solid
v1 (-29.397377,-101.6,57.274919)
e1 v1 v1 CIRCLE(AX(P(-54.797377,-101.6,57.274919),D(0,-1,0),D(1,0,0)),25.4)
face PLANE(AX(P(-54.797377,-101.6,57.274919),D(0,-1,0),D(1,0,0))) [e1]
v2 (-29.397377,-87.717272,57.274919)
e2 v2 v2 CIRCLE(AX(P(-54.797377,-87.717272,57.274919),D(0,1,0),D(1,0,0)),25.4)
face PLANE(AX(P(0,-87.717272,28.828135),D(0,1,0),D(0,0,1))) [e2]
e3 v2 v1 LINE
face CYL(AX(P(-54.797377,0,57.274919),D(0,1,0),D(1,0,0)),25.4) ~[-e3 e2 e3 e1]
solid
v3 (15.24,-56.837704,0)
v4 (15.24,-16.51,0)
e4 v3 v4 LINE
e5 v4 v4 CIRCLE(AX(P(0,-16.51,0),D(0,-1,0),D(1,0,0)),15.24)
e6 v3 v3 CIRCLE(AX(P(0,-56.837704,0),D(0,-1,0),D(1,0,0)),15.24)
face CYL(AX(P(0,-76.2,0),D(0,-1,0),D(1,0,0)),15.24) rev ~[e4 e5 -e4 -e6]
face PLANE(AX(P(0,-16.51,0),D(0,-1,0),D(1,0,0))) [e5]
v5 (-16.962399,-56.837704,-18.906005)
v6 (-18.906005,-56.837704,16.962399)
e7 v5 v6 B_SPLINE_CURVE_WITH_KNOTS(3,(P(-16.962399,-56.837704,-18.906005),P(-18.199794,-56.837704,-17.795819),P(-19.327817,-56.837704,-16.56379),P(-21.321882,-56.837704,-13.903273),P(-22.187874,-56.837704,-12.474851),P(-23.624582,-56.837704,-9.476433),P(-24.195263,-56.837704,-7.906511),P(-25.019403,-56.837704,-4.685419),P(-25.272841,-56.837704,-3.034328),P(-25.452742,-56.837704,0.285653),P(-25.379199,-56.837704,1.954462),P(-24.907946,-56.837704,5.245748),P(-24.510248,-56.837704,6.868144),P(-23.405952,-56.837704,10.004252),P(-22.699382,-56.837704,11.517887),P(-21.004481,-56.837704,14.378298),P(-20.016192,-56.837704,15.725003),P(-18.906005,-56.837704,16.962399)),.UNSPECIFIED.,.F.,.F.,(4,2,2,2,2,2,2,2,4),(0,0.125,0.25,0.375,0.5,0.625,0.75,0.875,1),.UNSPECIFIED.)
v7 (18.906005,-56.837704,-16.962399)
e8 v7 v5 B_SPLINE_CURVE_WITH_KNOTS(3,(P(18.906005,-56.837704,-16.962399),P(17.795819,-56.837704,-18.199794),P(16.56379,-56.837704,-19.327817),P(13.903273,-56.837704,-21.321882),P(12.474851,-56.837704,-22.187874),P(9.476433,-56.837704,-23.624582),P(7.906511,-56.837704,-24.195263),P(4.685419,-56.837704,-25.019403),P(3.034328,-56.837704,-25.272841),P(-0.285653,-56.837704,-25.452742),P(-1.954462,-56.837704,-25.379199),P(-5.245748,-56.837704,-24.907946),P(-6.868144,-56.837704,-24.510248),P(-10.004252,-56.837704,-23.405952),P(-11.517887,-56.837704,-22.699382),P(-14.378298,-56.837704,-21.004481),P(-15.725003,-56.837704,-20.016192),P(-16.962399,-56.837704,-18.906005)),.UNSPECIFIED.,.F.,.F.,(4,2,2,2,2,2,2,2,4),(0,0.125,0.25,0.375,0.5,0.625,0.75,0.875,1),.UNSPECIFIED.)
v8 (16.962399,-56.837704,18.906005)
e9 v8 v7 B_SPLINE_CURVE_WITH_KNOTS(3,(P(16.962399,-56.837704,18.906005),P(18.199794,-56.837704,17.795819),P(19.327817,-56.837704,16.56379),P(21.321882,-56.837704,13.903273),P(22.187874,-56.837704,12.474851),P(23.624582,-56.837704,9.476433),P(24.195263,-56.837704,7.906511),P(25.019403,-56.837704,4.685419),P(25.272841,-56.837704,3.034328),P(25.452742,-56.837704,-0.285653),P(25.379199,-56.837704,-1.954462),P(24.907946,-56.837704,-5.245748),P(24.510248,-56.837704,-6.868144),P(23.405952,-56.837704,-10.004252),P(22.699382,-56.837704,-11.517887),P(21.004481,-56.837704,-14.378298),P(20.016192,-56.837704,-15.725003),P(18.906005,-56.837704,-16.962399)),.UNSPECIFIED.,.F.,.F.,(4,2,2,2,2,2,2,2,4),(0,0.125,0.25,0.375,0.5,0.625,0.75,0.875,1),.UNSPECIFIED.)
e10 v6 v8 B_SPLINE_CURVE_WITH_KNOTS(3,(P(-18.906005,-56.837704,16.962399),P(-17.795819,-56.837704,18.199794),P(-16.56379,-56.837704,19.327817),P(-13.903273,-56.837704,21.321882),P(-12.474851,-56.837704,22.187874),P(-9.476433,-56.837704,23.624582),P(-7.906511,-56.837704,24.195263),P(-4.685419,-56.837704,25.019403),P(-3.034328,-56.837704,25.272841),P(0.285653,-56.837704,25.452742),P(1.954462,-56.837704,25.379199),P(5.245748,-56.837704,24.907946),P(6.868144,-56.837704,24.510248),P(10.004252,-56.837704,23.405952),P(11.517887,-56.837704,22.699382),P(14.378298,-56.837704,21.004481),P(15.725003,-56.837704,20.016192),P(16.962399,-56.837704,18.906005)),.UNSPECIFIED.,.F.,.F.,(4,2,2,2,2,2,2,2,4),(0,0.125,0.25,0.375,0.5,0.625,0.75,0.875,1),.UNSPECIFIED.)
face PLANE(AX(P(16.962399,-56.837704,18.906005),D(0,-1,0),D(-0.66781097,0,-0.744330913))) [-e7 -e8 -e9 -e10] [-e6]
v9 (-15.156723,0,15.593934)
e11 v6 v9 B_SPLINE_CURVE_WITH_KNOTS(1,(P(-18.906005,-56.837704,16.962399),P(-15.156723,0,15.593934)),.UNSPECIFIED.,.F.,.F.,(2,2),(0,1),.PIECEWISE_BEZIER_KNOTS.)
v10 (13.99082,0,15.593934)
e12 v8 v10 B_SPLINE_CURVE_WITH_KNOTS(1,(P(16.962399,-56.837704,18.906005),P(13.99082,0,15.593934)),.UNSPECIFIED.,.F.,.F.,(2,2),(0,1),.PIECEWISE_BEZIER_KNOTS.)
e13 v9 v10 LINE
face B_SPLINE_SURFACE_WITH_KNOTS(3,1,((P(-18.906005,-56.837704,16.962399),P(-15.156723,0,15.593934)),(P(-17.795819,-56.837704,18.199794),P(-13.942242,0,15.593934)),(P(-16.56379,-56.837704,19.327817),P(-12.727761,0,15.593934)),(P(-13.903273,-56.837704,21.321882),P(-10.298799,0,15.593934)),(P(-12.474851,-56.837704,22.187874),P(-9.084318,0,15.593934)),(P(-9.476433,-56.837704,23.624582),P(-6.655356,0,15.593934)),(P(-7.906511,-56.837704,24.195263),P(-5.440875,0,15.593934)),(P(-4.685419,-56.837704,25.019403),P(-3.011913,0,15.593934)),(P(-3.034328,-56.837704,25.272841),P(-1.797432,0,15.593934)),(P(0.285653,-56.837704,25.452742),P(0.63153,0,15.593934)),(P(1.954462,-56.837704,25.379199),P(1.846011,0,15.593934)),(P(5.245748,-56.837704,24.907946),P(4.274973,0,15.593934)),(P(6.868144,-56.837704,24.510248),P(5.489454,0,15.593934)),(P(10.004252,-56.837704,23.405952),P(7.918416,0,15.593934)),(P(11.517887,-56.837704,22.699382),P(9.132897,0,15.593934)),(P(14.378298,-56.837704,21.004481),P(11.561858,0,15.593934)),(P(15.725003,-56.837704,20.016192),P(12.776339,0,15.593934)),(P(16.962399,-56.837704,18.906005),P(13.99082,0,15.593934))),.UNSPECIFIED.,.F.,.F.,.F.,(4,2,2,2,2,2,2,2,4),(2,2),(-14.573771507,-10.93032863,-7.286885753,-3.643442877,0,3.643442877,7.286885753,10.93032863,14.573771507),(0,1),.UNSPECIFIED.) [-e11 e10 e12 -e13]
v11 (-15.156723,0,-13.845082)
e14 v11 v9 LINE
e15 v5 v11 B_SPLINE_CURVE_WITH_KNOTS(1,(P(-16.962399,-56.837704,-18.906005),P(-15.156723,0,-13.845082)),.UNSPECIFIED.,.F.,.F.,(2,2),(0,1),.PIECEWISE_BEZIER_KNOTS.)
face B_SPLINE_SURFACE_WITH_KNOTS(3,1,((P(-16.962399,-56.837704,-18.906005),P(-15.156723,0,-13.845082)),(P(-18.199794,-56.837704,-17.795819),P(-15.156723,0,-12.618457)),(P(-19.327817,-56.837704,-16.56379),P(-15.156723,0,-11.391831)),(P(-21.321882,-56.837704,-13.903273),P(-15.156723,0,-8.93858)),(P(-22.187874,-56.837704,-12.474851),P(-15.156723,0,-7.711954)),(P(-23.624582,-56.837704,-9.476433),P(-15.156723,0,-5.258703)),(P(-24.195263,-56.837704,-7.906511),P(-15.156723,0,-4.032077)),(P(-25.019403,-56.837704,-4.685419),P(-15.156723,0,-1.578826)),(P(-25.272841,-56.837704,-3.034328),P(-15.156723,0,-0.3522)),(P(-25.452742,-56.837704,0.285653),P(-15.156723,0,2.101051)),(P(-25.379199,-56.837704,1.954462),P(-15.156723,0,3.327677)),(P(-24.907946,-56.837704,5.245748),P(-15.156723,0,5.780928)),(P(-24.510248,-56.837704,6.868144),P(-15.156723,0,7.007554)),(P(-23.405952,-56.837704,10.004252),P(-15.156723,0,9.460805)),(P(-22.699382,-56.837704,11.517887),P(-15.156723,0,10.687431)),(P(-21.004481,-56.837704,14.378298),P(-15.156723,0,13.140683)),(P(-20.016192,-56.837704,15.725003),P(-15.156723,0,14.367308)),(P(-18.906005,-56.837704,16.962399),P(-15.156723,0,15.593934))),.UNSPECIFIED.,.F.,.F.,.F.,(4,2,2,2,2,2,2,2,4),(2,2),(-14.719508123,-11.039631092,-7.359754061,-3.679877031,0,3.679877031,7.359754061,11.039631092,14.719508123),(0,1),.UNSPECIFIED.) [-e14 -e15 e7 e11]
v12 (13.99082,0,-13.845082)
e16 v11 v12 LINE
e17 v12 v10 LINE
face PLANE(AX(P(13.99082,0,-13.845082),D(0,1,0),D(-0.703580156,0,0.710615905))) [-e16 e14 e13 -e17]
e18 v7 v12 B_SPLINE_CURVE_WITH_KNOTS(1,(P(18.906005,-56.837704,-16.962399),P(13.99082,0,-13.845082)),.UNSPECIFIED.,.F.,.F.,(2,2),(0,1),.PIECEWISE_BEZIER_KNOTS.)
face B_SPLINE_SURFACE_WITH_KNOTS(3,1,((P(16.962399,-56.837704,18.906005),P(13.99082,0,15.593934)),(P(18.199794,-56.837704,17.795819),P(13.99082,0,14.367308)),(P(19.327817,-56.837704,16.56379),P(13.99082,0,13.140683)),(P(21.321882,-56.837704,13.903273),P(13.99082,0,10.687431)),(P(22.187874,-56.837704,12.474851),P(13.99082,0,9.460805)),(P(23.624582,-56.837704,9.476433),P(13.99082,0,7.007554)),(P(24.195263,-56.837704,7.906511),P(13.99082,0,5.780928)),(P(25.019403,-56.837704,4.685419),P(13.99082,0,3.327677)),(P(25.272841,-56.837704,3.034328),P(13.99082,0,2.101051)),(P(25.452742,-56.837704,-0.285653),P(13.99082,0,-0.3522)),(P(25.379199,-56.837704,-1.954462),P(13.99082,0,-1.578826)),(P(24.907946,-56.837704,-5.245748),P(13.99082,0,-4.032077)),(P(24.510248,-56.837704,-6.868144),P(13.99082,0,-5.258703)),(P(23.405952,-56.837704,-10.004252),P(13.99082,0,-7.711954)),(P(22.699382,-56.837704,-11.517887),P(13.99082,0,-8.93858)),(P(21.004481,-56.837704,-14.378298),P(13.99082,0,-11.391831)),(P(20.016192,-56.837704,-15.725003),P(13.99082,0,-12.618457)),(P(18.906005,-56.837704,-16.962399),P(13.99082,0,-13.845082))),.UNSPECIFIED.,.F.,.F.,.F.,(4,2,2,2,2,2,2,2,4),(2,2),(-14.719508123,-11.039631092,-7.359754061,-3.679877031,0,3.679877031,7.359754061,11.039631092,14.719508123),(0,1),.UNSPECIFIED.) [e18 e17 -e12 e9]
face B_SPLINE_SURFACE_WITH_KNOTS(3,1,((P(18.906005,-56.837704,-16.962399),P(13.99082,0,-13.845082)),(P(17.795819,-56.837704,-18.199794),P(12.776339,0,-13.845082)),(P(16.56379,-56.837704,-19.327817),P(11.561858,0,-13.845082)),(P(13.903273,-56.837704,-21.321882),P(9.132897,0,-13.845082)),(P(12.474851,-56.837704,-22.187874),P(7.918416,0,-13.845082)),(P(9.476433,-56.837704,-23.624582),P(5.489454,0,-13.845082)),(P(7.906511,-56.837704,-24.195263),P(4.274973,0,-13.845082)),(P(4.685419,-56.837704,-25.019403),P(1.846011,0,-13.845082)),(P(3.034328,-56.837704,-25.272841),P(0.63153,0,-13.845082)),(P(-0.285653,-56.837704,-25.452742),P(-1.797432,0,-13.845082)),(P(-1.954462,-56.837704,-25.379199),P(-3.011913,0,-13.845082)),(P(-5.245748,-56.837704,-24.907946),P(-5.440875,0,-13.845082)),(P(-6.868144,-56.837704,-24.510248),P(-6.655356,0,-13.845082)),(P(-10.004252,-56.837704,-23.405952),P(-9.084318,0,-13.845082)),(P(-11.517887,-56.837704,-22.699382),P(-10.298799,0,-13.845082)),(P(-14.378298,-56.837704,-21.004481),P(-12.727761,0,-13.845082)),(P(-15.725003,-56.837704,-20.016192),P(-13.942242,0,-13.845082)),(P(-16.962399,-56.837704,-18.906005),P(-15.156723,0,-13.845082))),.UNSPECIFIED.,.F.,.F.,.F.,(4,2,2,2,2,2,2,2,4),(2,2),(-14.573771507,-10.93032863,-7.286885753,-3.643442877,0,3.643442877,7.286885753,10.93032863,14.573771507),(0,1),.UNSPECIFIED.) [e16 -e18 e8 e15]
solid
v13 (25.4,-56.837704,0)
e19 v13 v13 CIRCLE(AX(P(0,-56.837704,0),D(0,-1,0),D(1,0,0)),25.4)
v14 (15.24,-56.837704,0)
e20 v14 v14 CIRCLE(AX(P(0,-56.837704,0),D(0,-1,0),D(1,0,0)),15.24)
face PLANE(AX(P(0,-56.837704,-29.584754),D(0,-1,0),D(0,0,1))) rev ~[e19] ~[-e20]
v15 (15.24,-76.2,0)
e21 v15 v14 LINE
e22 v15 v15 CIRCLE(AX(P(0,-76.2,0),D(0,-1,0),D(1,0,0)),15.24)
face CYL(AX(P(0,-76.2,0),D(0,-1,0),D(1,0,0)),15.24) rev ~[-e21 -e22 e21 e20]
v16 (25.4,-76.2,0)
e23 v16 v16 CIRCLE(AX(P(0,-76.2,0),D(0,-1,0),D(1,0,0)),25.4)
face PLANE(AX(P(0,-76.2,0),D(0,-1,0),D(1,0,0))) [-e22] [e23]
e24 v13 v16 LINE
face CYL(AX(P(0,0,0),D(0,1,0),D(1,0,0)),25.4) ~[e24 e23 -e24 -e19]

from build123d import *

# Parameters (mm, degrees)
F0_R          = 25.4
F1_DEPTH      = 76.2
F2_W          = 59.7524605691
F2_H          = 58.5865583271
F3_DEPTH      = 43.434
F3_DEPTH_BACK = 30.226
F4_W          = 29.1475430131
F4_H          = 29.4390162453
F6_R          = 15.24
F7_DEPTH      = 59.69
F8_R          = 25.4
F9_DEPTH      = 101.6
F10_W         = 93.4799709357
F10_H         = 55.210987106
F11_DEPTH     = 89.916


# Not quite as in the source:
# - the arcs of a loft's sections are written as splines that run evenly, so that the points pair up as in the source's solid


with BuildPart() as f1:
    # F0 (on Front) → F1 (new body)
    with BuildSketch(Plane.XZ):
        Circle(F0_R)
    extrude(amount=F1_DEPTH)

    # F2 (on Right) → F3 (cut, two sides)
    with BuildSketch(Plane.YZ) as f3_sk:
        with Locations((-26.9614737481, -0.2914750949)):
            Rectangle(F2_W, F2_H)
    extrude(amount=-F3_DEPTH, mode=Mode.SUBTRACT)
    extrude(f3_sk.sketch, amount=F3_DEPTH_BACK, mode=Mode.SUBTRACT)


with BuildPart() as f5:
    # F3_face (on face) → F5 section 0
    with BuildSketch(Plane(origin=(0, -56.8377040327, 0), x_dir=(-1, 0, 0), z_dir=(0, 1, 0))):
        with BuildLine():
            add(Edge.make_bspline(
                [(-16.9623986454, 18.9060051887), (-18.1997937915, 17.7958187934), (-19.3278172281, 16.5637900788), (-21.321881876, 13.9032734939), (-22.18787378, 12.4748514101), (-23.6245819975, 9.4764331911), (-24.1952627855, 7.9065111976), (-25.0194026816, 4.6854188751), (-25.2728414111, 3.0343281939), (-25.4527417517, -0.2856534605), (-25.3791989144, -1.9544623407), (-24.9079462304, -5.2457482939), (-24.5102480363, -6.8681439836), (-23.405952304, -10.0042519622), (-22.6993820716, -11.5178867049), (-21.0044807567, -14.3782978381), (-20.0161915839, -15.7250034994), (-18.9060051887, -16.9623986454)],
                knots=[0, 0, 0, 0, 0.125, 0.125, 0.25, 0.25, 0.375, 0.375, 0.5, 0.5, 0.625, 0.625, 0.75, 0.75, 0.875, 0.875, 1, 1, 1, 1], degree=3))
            add(Edge.make_bspline(
                [(-18.9060051887, -16.9623986454), (-17.7958187934, -18.1997937915), (-16.5637900788, -19.3278172281), (-13.9032734939, -21.321881876), (-12.4748514101, -22.18787378), (-9.4764331911, -23.6245819975), (-7.9065111976, -24.1952627855), (-4.6854188751, -25.0194026816), (-3.0343281939, -25.2728414111), (0.2856534605, -25.4527417517), (1.9544623407, -25.3791989144), (5.2457482939, -24.9079462304), (6.8681439836, -24.5102480363), (10.0042519622, -23.405952304), (11.5178867049, -22.6993820716), (14.3782978381, -21.0044807567), (15.7250034994, -20.0161915839), (16.9623986454, -18.9060051887)],
                knots=[0, 0, 0, 0, 0.125, 0.125, 0.25, 0.25, 0.375, 0.375, 0.5, 0.5, 0.625, 0.625, 0.75, 0.75, 0.875, 0.875, 1, 1, 1, 1], degree=3))
            add(Edge.make_bspline(
                [(16.9623986454, -18.9060051887), (18.1997937915, -17.7958187934), (19.3278172281, -16.5637900788), (21.321881876, -13.9032734939), (22.18787378, -12.4748514101), (23.6245819975, -9.4764331911), (24.1952627855, -7.9065111976), (25.0194026816, -4.6854188751), (25.2728414111, -3.0343281939), (25.4527417517, 0.2856534605), (25.3791989144, 1.9544623407), (24.9079462304, 5.2457482939), (24.5102480363, 6.8681439836), (23.405952304, 10.0042519622), (22.6993820716, 11.5178867049), (21.0044807567, 14.3782978381), (20.0161915839, 15.7250034994), (18.9060051887, 16.9623986454)],
                knots=[0, 0, 0, 0, 0.125, 0.125, 0.25, 0.25, 0.375, 0.375, 0.5, 0.5, 0.625, 0.625, 0.75, 0.75, 0.875, 0.875, 1, 1, 1, 1], degree=3))
            add(Edge.make_bspline(
                [(18.9060051887, 16.9623986454), (17.7958187934, 18.1997937915), (16.5637900788, 19.3278172281), (13.9032734939, 21.321881876), (12.4748514101, 22.18787378), (9.4764331911, 23.6245819975), (7.9065111976, 24.1952627855), (4.6854188751, 25.0194026816), (3.0343281939, 25.2728414111), (-0.2856534605, 25.4527417517), (-1.9544623407, 25.3791989144), (-5.2457482939, 24.9079462304), (-6.8681439836, 24.5102480363), (-10.0042519622, 23.405952304), (-11.5178867049, 22.6993820716), (-14.3782978381, 21.0044807567), (-15.7250034994, 20.0161915839), (-16.9623986454, 18.9060051887)],
                knots=[0, 0, 0, 0, 0.125, 0.125, 0.25, 0.25, 0.375, 0.375, 0.5, 0.5, 0.625, 0.625, 0.75, 0.75, 0.875, 0.875, 1, 1, 1, 1], degree=3))
        make_face()
    # F4 (on Front) → F5 section 1
    with BuildSketch(Plane.XZ):
        with Locations((-0.582951121, 0.8744257502)):
            Rectangle(F4_W, F4_H)
    loft(ruled=True)


with BuildPart() as f7_tool:
    # F6 (on face) → F7 (new body)
    with BuildSketch(Plane.XZ.offset(76.2)):
        Circle(F6_R)
    extrude(amount=-F7_DEPTH)


with BuildPart() as f1_1:
    add(f1.part)

    # F7: cut by f7_tool
    add(f7_tool.part, mode=Mode.SUBTRACT)


with BuildPart() as f5_1:
    add(f5.part)

    # F7: cut by f7_tool
    add(f7_tool.part, mode=Mode.SUBTRACT)


with BuildPart() as f9:
    # F8 (on Front) → F9 (new body)
    with BuildSketch(Plane.XZ):
        with Locations((-54.7973774374, 57.2749190032)):
            Circle(F8_R)
    extrude(amount=F9_DEPTH)

    # F10 (on Right) → F11 (cut)
    with BuildSketch(Plane.YZ):
        with Locations((-40.9772868734, 56.4336283132)):
            Rectangle(F10_W, F10_H)
    extrude(amount=-F11_DEPTH, mode=Mode.SUBTRACT)


solid = Compound([f1_1.part, f5_1.part, f9.part])
